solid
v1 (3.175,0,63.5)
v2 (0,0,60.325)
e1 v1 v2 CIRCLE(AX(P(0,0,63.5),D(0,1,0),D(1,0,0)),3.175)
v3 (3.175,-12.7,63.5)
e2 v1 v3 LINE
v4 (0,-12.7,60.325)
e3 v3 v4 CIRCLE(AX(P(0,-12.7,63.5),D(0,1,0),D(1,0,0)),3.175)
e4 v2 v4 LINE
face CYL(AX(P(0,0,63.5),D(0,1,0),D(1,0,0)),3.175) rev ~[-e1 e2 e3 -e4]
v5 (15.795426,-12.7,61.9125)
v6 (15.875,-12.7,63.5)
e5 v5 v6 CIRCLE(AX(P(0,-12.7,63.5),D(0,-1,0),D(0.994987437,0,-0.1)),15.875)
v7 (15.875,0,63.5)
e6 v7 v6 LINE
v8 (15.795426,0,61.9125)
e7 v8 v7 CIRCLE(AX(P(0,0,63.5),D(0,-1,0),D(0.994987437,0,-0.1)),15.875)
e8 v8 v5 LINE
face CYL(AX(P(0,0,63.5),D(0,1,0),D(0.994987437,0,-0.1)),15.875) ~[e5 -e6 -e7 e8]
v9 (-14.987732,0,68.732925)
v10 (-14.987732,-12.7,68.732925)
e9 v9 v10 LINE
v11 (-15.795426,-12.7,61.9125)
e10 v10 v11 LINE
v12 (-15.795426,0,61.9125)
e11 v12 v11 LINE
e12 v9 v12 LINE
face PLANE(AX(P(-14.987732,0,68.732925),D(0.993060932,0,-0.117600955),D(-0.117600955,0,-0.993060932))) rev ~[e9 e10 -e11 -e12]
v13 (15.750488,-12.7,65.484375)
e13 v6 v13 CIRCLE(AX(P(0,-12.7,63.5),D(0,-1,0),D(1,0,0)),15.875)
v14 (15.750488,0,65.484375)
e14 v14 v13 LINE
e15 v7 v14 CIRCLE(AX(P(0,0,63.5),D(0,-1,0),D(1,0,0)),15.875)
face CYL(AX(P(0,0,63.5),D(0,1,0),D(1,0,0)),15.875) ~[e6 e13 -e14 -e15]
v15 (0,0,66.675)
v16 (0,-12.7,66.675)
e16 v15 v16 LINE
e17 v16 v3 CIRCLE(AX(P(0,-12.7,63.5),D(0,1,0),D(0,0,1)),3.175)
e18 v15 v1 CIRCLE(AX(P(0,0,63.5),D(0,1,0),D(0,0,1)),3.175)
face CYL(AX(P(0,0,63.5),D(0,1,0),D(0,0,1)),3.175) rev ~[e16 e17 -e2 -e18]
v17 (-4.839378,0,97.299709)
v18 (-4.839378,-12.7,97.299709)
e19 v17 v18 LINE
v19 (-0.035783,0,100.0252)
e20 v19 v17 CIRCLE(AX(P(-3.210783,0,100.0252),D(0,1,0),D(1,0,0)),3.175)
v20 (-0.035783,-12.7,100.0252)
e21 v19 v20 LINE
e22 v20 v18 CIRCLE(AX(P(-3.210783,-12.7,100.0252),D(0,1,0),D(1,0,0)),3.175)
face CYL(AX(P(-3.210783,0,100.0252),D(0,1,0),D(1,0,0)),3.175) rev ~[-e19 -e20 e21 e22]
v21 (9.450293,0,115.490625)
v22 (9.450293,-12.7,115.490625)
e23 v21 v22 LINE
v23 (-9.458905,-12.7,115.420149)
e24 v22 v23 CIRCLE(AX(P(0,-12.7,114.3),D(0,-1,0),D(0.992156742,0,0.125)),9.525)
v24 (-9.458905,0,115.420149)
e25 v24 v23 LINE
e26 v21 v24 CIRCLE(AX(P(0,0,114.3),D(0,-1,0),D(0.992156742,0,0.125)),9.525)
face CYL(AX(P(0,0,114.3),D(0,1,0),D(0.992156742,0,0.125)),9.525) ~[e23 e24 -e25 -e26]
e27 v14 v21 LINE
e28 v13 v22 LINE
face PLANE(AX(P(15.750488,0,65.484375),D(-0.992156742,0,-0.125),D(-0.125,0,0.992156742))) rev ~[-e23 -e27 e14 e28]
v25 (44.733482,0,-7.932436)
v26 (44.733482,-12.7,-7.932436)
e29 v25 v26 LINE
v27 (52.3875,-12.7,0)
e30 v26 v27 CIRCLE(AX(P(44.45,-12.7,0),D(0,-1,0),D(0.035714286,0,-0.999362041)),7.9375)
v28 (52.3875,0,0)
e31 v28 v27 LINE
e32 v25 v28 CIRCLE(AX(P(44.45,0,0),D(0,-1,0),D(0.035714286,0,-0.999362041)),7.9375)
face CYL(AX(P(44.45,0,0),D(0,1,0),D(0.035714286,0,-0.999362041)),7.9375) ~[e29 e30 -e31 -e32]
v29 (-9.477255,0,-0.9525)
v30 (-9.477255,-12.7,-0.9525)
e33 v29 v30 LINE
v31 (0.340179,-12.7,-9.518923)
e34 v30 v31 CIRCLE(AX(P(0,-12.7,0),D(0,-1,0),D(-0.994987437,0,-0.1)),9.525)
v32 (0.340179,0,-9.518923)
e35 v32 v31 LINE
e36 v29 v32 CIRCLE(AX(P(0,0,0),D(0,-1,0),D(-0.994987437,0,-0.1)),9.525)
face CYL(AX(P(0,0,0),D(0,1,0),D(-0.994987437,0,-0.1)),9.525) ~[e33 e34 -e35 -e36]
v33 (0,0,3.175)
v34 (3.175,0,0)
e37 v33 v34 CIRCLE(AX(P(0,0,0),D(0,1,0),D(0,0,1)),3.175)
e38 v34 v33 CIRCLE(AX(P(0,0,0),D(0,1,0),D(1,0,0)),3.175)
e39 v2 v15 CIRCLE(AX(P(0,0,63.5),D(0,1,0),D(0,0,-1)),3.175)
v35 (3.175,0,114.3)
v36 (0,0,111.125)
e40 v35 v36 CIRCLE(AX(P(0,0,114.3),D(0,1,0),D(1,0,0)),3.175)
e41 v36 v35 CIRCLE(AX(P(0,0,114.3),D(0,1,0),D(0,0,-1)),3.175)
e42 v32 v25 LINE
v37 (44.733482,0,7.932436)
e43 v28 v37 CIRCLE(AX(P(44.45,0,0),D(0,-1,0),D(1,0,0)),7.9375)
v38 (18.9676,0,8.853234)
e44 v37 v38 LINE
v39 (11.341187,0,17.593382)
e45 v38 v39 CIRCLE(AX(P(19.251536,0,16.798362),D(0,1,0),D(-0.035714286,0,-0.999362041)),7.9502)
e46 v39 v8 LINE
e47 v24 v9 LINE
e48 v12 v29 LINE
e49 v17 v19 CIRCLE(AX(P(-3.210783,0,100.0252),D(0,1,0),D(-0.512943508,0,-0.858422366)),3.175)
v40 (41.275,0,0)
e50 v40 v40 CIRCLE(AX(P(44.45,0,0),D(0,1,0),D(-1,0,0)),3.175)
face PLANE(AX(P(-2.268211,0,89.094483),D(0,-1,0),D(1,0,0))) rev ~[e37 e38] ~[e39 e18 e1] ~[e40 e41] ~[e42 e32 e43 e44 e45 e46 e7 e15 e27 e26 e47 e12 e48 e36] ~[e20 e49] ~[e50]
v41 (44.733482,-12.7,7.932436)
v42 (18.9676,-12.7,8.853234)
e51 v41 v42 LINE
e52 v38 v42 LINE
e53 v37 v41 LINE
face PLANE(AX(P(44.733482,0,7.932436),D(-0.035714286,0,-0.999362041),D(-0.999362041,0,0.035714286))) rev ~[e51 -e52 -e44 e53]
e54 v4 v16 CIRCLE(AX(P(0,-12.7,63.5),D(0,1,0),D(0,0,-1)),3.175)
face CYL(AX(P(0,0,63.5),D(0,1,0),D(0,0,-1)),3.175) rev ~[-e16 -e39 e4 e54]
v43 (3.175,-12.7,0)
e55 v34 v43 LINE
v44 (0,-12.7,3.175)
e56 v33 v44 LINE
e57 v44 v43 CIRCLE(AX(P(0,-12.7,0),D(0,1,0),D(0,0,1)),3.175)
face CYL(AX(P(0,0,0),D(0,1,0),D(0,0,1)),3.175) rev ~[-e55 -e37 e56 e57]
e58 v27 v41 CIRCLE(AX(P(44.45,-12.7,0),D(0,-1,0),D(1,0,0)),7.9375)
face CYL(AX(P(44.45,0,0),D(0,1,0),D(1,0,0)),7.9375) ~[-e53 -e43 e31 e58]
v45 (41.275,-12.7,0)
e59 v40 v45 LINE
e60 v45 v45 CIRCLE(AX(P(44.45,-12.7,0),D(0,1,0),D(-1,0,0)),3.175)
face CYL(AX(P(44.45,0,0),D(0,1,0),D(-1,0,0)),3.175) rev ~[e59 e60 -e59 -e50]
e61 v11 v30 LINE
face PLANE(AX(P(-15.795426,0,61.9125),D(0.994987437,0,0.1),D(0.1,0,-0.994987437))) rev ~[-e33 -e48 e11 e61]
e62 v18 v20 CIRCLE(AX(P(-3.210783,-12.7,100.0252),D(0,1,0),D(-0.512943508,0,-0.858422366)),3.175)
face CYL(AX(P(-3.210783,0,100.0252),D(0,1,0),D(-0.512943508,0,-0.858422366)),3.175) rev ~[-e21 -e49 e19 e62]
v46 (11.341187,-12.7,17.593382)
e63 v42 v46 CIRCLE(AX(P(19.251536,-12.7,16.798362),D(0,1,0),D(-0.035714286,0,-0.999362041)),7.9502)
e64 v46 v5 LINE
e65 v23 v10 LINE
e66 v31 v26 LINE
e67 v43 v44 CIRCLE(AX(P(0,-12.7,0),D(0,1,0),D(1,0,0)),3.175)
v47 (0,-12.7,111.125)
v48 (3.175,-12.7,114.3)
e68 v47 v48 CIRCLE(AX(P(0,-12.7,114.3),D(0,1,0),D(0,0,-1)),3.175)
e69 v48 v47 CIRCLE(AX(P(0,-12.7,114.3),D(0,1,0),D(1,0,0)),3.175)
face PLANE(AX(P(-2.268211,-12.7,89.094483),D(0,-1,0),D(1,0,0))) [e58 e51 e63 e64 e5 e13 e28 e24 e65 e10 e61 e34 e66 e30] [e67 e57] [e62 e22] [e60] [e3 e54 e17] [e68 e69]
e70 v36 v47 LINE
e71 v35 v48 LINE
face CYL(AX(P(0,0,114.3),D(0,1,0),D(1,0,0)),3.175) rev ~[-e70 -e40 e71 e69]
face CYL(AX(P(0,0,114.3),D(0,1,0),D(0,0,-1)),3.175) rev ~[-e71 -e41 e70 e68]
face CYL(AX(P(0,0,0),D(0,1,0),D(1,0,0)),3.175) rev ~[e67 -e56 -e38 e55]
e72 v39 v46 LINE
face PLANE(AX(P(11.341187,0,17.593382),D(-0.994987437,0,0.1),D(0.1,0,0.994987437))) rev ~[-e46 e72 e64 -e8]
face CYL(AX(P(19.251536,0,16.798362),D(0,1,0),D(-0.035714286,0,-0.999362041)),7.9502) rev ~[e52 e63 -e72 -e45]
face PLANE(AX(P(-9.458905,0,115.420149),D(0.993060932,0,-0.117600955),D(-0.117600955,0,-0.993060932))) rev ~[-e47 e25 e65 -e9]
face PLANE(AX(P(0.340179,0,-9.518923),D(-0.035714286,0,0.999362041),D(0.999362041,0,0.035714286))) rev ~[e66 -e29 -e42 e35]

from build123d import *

# Parameters (mm, degrees)
F1_DEPTH = 12.7


with BuildPart() as f1:
    # F0 (on Front) → F1 (new body)
    with BuildSketch(Plane.XZ):
        with BuildLine():
            Line((0, 79.375), (0, 89.5573869348))
            Line((0, 89.5573869348), (0, 100.0252))
            Line((0, 100.0252), (-0.0357827719, 100.0252))
            ThreePointArc((-0.0357827719, 100.0252), (-1.6439653205, 97.2637315367), (-4.8393784091, 97.2997089891))
            Line((-4.8393784091, 97.2997089891), (-4.8393784091, 78.6193928983))
            ThreePointArc((-4.8393784091, 78.6193928983), (-2.4490062004, 79.1849607469), (0, 79.375))
        make_face()
        with BuildLine():
            Line((0, 100.0252), (0, 89.5573869348))
            Line((0, 89.5573869348), (0, 79.375))
            ThreePointArc((0, 79.375), (10.5003255158, 75.40625), (15.7504882737, 65.484375))
            Line((15.7504882737, 65.484375), (9.4502929642, 115.490625))
            ThreePointArc((9.4502929642, 115.490625), (9.5063048942, 114.896483242), (9.525, 114.3))
            ThreePointArc((9.525, 114.3), (6.7351920908, 107.5648079092), (0, 104.775))
            Line((0, 104.775), (0, 100.0252))
        make_face()
        with BuildLine():
            Line((-0.0357827719, 100.0252), (0, 100.0252))
            Line((0, 100.0252), (0, 104.775))
            ThreePointArc((0, 104.775), (-7.1202192788, 107.9732233782), (-9.4589053806, 115.4201490977))
            Line((-9.4589053806, 115.4201490977), (-14.9877324754, 68.7329246359))
            ThreePointArc((-14.9877324754, 68.7329246359), (-11.0776416797, 74.8710808553), (-4.8393784091, 78.6193928983))
            Line((-4.8393784091, 78.6193928983), (-4.8393784091, 97.2997089891))
            ThreePointArc((-4.8393784091, 97.2997089891), (-4.7776002233, 102.7866684633), (-0.0357827719, 100.0252))
        make_face()
        with BuildLine():
            ThreePointArc((15.7504882737, 65.484375), (10.5003255158, 75.40625), (0, 79.375))
            Line((0, 79.375), (0, 66.675))
            ThreePointArc((0, 66.675), (2.2450640303, 65.7450640303), (3.175, 63.5))
            ThreePointArc((3.175, 63.5), (2.2450640303, 61.2549359697), (0, 60.325))
            Line((0, 60.325), (0, 47.625))
            ThreePointArc((0, 47.625), (10.6492737428, 51.7267849017), (15.7954255641, 61.9125))
            ThreePointArc((15.7954255641, 61.9125), (15.8550939106, 62.7052534459), (15.875, 63.5))
            ThreePointArc((15.875, 63.5), (15.8438414904, 64.4941387366), (15.7504882737, 65.484375))
        make_face()
        with BuildLine():
            Line((0, 66.675), (0, 79.375))
            ThreePointArc((0, 79.375), (-2.4490062004, 79.1849607469), (-4.8393784091, 78.6193928983))
            ThreePointArc((-4.8393784091, 78.6193928983), (-11.0776416797, 74.8710808553), (-14.9877324754, 68.7329246359))
            Line((-14.9877324754, 68.7329246359), (-15.7954255641, 61.9125))
            ThreePointArc((-15.7954255641, 61.9125), (-10.6492737428, 51.7267849017), (0, 47.625))
            Line((0, 47.625), (0, 60.325))
            ThreePointArc((0, 60.325), (-3.175, 63.5), (0, 66.675))
        make_face()
        with BuildLine():
            ThreePointArc((-9.4589053806, 115.4201490977), (-7.1202192788, 107.9732233782), (0, 104.775))
            ThreePointArc((0, 104.775), (6.7351920908, 107.5648079092), (9.525, 114.3))
            ThreePointArc((9.525, 114.3), (9.5063048942, 114.896483242), (9.4502929642, 115.490625))
            ThreePointArc((9.4502929642, 115.490625), (-0.0355000934, 123.8249338446), (-9.4589053806, 115.4201490977))
        make_face()
        with BuildLine():
            ThreePointArc((3.175, 114.3), (2.2450640303, 112.0549359697), (0, 111.125))
            ThreePointArc((0, 111.125), (-2.2450640303, 116.5450640303), (3.175, 114.3))
        make_face(mode=Mode.SUBTRACT)
        with BuildLine():
            ThreePointArc((15.7954255641, 61.9125), (10.6492737428, 51.7267849017), (0, 47.625))
            Line((0, 47.625), (0, 9.525))
            ThreePointArc((0, 9.525), (6.7351920908, 6.7351920908), (9.525, 0))
            Line((9.525, 0), (36.5125, 0))
            ThreePointArc((36.5125, 0), (38.9384772185, 5.7120069047), (44.7334821429, 7.9324362036))
            Line((44.7334821429, 7.9324362036), (18.9676000005, 8.8532337108))
            ThreePointArc((18.9676000005, 8.8532337108), (13.2611998974, 11.5713591498), (11.3411865923, 17.5933818124))
            Line((11.3411865923, 17.5933818124), (15.7954255641, 61.9125))
        make_face()
        with BuildLine():
            Line((0, 9.525), (0, 47.625))
            ThreePointArc((0, 47.625), (-10.6492737428, 51.7267849017), (-15.7954255641, 61.9125))
            Line((-15.7954255641, 61.9125), (-9.4772553384, -0.9525))
            ThreePointArc((-9.4772553384, -0.9525), (-7.063929059, 6.3895642457), (0, 9.525))
        make_face()
        with BuildLine():
            ThreePointArc((9.525, 0), (6.7351920908, 6.7351920908), (0, 9.525))
            Line((0, 9.525), (0, 3.175))
            ThreePointArc((0, 3.175), (2.2450640303, 2.2450640303), (3.175, 0))
            Line((3.175, 0), (9.525, 0))
        make_face()
        with BuildLine():
            Line((0, 3.175), (0, 9.525))
            ThreePointArc((0, 9.525), (-7.063929059, 6.3895642457), (-9.4772553384, -0.9525))
            ThreePointArc((-9.4772553384, -0.9525), (-6.2623833816, -7.1769199091), (0.3401785714, -9.5189234444))
            ThreePointArc((0.3401785714, -9.5189234444), (6.8544082857, -6.6138273378), (9.525, 0))
            Line((9.525, 0), (3.175, 0))
            ThreePointArc((3.175, 0), (-2.2450640303, -2.2450640303), (0, 3.175))
        make_face()
        with BuildLine():
            Line((36.5125, 0), (9.525, 0))
            ThreePointArc((9.525, 0), (6.8544082857, -6.6138273378), (0.3401785714, -9.5189234444))
            Line((0.3401785714, -9.5189234444), (44.7334821429, -7.9324362036))
            ThreePointArc((44.7334821429, -7.9324362036), (38.9384772185, -5.7120069047), (36.5125, 0))
        make_face()
        with BuildLine():
            ThreePointArc((44.7334821429, 7.9324362036), (38.9384772185, 5.7120069047), (36.5125, 0))
            ThreePointArc((36.5125, 0), (38.9384772185, -5.7120069047), (44.7334821429, -7.9324362036))
            ThreePointArc((44.7334821429, -7.9324362036), (50.1620069047, -5.5115227815), (52.3875, 0))
            ThreePointArc((52.3875, 0), (50.1620069047, 5.5115227815), (44.7334821429, 7.9324362036))
        make_face()
        with BuildLine():
            ThreePointArc((47.625, 0), (44.45, -3.175), (41.275, 0))
            ThreePointArc((41.275, 0), (44.45, 3.175), (47.625, 0))
        make_face(mode=Mode.SUBTRACT)
    extrude(amount=F1_DEPTH)


solid = f1.part
